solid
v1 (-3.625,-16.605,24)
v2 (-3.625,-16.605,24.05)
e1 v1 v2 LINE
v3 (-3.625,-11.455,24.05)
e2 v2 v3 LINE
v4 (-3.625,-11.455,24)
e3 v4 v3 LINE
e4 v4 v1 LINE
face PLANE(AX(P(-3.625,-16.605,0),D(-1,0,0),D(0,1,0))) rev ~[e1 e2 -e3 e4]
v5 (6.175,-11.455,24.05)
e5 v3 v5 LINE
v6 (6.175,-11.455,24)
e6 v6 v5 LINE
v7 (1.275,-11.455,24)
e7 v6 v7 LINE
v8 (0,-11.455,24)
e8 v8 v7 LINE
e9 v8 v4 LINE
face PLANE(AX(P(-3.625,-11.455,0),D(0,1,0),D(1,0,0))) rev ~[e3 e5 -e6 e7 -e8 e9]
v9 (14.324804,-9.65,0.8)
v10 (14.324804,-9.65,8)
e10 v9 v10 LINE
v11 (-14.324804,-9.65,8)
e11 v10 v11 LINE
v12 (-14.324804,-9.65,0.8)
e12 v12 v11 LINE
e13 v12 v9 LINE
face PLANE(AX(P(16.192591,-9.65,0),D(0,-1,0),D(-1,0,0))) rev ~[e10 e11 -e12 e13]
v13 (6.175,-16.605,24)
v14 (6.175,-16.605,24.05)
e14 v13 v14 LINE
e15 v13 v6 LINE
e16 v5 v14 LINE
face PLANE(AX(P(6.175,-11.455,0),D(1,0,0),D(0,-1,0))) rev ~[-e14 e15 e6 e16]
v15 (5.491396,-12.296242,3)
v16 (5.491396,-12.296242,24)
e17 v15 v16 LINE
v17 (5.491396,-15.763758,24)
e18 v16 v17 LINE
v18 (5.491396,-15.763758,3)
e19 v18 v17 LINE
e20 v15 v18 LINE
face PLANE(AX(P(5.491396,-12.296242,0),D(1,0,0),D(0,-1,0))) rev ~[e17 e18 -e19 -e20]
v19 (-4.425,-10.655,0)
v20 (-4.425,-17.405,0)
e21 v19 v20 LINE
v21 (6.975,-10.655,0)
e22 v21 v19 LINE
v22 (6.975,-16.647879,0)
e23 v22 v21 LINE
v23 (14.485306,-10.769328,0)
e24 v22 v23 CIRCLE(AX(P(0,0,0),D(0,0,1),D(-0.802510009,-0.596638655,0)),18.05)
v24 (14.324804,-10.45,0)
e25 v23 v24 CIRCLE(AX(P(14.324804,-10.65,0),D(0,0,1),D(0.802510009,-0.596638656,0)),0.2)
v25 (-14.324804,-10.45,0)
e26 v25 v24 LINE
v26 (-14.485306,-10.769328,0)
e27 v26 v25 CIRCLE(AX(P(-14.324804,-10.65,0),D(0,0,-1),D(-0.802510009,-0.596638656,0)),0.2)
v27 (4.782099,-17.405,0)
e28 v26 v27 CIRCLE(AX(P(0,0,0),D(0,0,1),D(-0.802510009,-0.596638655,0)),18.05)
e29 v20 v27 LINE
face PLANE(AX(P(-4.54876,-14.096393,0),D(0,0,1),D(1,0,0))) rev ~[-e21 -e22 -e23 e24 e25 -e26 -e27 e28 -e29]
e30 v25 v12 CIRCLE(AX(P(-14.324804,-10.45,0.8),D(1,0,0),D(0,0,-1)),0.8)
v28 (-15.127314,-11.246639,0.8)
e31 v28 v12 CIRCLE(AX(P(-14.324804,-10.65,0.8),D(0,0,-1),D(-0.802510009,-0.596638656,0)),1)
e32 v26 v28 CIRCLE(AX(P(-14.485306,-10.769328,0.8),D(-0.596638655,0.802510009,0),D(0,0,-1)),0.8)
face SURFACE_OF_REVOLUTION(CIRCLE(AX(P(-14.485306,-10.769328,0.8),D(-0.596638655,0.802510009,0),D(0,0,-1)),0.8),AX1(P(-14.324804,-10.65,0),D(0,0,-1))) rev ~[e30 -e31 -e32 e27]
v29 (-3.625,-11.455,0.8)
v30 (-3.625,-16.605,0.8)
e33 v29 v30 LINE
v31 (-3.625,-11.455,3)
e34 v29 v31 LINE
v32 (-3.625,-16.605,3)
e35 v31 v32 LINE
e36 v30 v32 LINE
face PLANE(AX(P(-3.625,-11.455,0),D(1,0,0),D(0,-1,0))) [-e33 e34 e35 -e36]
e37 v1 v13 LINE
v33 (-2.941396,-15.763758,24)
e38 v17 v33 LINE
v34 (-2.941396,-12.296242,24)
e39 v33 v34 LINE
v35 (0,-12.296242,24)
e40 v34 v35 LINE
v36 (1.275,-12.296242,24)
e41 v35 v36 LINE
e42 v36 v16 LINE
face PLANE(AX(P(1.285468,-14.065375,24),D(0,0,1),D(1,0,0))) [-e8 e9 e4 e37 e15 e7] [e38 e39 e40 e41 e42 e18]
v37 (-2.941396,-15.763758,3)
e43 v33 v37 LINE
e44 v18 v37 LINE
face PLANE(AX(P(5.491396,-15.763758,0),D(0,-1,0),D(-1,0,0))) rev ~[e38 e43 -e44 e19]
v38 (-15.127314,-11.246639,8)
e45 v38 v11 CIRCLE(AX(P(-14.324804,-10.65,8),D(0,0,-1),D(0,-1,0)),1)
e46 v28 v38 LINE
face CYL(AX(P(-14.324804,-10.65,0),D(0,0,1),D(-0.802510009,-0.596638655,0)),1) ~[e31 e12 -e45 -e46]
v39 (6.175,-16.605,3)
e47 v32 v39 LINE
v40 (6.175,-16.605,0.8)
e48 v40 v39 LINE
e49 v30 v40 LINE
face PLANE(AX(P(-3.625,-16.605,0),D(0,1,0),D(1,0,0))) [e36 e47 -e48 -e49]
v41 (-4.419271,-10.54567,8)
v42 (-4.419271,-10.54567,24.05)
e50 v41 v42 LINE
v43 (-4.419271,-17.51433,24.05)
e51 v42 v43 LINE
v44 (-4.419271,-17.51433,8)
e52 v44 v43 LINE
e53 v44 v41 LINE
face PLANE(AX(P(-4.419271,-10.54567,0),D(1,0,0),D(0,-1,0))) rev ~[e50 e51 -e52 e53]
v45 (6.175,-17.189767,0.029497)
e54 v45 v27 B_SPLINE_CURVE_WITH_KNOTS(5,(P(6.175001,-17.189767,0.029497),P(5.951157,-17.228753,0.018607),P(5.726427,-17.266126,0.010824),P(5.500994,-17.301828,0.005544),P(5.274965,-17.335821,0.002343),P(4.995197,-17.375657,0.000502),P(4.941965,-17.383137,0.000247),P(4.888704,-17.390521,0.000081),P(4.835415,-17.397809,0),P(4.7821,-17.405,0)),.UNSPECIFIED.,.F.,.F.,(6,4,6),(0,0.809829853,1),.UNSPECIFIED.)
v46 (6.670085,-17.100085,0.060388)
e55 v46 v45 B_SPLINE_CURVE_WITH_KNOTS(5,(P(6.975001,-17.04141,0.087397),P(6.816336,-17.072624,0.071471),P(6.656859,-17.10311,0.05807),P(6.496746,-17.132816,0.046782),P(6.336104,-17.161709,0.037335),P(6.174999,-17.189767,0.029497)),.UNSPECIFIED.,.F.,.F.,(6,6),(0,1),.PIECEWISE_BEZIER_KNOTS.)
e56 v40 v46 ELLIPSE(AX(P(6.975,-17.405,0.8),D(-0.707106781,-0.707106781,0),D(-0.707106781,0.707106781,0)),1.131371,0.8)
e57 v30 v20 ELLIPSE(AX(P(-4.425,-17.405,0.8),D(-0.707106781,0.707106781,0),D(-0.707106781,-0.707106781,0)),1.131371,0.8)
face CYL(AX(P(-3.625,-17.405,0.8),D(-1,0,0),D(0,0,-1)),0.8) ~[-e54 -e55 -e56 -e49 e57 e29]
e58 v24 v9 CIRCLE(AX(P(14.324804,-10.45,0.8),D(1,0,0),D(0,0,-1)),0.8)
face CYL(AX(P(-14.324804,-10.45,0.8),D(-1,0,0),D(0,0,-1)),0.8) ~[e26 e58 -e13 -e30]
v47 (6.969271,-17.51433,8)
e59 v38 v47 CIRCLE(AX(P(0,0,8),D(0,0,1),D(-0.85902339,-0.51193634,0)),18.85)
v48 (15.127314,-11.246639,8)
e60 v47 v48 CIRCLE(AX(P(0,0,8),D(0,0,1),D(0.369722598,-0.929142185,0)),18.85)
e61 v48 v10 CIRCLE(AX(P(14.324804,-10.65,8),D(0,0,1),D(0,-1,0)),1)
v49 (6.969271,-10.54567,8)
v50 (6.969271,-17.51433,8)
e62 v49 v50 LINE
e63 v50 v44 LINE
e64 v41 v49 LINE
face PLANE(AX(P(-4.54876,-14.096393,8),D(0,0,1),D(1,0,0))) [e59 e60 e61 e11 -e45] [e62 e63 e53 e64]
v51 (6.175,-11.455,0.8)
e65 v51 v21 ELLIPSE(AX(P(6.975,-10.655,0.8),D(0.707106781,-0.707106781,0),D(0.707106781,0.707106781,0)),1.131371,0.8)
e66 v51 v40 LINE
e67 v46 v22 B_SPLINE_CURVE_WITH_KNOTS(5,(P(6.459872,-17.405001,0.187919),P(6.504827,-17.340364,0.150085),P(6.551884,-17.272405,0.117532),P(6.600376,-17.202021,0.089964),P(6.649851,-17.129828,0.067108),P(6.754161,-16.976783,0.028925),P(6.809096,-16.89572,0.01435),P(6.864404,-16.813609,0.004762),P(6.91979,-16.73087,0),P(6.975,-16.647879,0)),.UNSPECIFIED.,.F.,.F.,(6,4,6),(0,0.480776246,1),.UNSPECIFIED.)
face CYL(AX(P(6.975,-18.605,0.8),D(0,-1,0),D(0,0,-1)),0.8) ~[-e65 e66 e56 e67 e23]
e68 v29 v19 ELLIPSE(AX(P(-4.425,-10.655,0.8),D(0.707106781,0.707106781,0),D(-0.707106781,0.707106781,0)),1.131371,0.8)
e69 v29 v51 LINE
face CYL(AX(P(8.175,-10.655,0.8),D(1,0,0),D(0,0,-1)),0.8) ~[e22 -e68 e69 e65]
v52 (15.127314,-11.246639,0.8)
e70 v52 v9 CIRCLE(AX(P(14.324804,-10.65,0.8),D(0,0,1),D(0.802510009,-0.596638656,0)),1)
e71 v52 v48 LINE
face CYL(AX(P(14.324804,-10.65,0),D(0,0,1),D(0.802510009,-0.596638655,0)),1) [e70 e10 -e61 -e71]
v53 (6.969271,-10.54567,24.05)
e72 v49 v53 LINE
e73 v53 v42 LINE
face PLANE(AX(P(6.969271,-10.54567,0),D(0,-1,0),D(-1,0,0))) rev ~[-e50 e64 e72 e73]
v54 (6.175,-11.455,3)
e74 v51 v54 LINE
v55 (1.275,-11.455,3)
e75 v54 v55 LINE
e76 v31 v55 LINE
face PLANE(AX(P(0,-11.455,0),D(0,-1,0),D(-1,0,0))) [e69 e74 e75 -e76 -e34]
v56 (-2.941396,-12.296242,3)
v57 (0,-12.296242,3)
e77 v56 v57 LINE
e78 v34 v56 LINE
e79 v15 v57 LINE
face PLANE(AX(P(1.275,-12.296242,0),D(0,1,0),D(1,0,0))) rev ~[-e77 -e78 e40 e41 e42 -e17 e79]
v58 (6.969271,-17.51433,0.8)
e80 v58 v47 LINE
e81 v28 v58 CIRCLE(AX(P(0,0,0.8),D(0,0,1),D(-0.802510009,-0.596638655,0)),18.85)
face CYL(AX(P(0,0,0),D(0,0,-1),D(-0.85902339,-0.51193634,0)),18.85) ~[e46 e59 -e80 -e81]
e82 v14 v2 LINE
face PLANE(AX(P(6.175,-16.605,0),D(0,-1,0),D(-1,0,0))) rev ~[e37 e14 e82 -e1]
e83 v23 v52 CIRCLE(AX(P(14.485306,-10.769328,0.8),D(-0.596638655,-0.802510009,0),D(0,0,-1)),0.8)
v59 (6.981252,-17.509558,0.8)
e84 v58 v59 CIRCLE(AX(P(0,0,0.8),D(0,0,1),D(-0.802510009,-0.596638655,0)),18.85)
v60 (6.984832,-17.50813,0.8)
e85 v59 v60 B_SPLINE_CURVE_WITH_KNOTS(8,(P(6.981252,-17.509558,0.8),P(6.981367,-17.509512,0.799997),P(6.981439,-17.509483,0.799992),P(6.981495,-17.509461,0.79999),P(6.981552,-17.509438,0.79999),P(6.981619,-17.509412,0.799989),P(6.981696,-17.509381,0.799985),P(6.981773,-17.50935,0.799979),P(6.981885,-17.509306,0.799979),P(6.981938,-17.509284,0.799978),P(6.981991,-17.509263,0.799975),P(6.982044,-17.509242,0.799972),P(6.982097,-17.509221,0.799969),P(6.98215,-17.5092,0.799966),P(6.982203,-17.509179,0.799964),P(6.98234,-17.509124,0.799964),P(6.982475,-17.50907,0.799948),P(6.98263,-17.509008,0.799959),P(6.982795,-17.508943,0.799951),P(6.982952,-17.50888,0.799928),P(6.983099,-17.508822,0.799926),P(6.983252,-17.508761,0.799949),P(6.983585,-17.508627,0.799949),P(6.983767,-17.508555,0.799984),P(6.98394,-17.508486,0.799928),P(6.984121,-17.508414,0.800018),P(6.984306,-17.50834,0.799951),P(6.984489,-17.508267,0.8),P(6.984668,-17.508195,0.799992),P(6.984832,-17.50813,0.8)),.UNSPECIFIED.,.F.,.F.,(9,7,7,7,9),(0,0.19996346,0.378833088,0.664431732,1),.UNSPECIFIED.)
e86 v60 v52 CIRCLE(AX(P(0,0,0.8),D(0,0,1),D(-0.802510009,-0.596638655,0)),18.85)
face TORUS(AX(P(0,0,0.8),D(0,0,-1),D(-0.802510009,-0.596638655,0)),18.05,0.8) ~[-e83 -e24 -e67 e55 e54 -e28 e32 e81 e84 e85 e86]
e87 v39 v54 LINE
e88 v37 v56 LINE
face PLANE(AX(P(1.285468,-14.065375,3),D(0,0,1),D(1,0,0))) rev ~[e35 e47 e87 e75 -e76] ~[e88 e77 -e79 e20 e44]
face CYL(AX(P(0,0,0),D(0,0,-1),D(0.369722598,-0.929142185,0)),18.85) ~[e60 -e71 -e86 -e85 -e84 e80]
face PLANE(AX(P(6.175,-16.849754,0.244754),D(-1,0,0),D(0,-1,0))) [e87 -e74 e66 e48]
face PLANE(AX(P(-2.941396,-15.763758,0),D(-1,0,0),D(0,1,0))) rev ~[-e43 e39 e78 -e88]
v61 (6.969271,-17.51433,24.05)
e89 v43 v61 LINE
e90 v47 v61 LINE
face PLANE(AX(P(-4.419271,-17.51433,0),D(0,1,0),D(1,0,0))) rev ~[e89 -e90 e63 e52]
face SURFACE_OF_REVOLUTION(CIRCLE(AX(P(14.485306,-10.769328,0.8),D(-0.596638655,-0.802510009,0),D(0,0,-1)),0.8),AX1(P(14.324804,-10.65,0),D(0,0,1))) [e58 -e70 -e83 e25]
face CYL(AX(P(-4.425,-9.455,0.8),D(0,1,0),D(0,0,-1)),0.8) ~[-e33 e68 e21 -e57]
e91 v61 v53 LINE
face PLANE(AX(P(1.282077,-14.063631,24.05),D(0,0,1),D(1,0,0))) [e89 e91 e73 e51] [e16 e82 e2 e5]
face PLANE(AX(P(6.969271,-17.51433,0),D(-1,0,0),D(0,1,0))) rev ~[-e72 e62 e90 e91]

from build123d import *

# Parameters (mm, degrees)
F0_W         = 1.275
F0_H         = 0.8956698048
F0_H_2       = 0.9093301952
F0_H_3       = 0.8412417081
F1_DEPTH     = 8
F2_DEPTH     = 3
F3_DEPTH     = 21
F4_DEPTH     = 24.05
F5_R         = 1
F6_T1_DEPTH  = 28.6496073272
F6_T3_DEPTH  = 9.8
F6_T5_DEPTH  = 5.15
F6_T8_ANGLE  = 126.6295364974
F6_T10_ANGLE = 126.6295364974
F6_T12_ANGLE = 106.7409270051
F6_T17_DEPTH = 11.8
F6_T21_DEPTH = 7.15
F6_T28_DEPTH = 11.8
F6_T32_DEPTH = 7.15
F6_T39_DEPTH = 7.15
F6_T43_DEPTH = 11.8
F6_T50_DEPTH = 11.8
F6_T54_DEPTH = 7.15


# Not quite as in the source:
# - a fillet or chamfer that OpenCascade refuses, or shapes differently, is made with other operations: its cross-section is extruded or revolved along the edge and cut away or added


with BuildPart() as f1:
    # F0 (on Top) → F1 (new body)
    with BuildSketch(Plane.XY):
        with BuildLine():
            Line((0, -9.65), (-16.1925908983, -9.65))
            ThreePointArc((-16.1925908983, -9.65), (-6.0604727533, -17.8491784127), (6.9692709671, -17.5143301952))
            Line((6.9692709671, -17.5143301952), (-4.4192709671, -17.5143301952))
            Line((-4.4192709671, -17.5143301952), (-4.4192709671, -10.5456698048))
            Line((-4.4192709671, -10.5456698048), (0, -10.5456698048))
            Line((0, -10.5456698048), (0, -9.65))
        make_face()
        with BuildLine():
            ThreePointArc((6.9692709671, -17.5143301952), (12.2302855086, -14.3437309086), (16.1925908983, -9.65))
            Line((16.1925908983, -9.65), (1.275, -9.65))
            Line((1.275, -9.65), (1.275, -10.5456698048))
            Line((1.275, -10.5456698048), (6.9692709671, -10.5456698048))
            Line((6.9692709671, -10.5456698048), (6.9692709671, -17.5143301952))
        make_face()
        with Locations((0.6375, -10.0978349024)):
            Rectangle(F0_W, F0_H)
        Polygon((-4.4192709671, -17.5143301952), (6.9692709671, -17.5143301952), (6.9692709671, -10.5456698048), (1.275, -10.5456698048), (1.275, -11.455), (6.175, -11.455), (6.175, -16.605), (-3.625, -16.605), (-3.625, -11.455), (0, -11.455), (0, -10.5456698048), (-4.4192709671, -10.5456698048), align=None)
        with Locations((0.6375, -11.0003349024)):
            Rectangle(F0_W, F0_H_2)
        Polygon((0, -12.2962417081), (0, -11.455), (-3.625, -11.455), (-3.625, -16.605), (6.175, -16.605), (6.175, -11.455), (1.275, -11.455), (1.275, -12.2962417081), (5.4913964123, -12.2962417081), (5.4913964123, -15.7637582919), (-2.9413964123, -15.7637582919), (-2.9413964123, -12.2962417081), align=None)
        with Locations((0.6375, -11.875620854)):
            Rectangle(F0_W, F0_H_3)
    extrude(amount=F1_DEPTH)

    # F0 (on Top) → F2 (cut)
    with BuildSketch(Plane.XY):
        Polygon((0, -12.2962417081), (0, -11.455), (-3.625, -11.455), (-3.625, -16.605), (6.175, -16.605), (6.175, -11.455), (1.275, -11.455), (1.275, -12.2962417081), (5.4913964123, -12.2962417081), (5.4913964123, -15.7637582919), (-2.9413964123, -15.7637582919), (-2.9413964123, -12.2962417081), align=None)
        with Locations((0.6375, -11.875620854)):
            Rectangle(F0_W, F0_H_3)
    extrude(amount=F2_DEPTH, mode=Mode.SUBTRACT)

    # F3 (add): a face of the model
    f3_faces = [f1.faces().sort_by_distance(p)[0] for p in [
        (1.275, -16.4942920509, 3),
    ]]
    extrude(f3_faces, amount=-F3_DEPTH)

    # F0 (on Top) → F4 (join)
    with BuildSketch(Plane.XY):
        Polygon((-4.4192709671, -17.5143301952), (6.9692709671, -17.5143301952), (6.9692709671, -10.5456698048), (1.275, -10.5456698048), (1.275, -11.455), (6.175, -11.455), (6.175, -16.605), (-3.625, -16.605), (-3.625, -11.455), (0, -11.455), (0, -10.5456698048), (-4.4192709671, -10.5456698048), align=None)
        with Locations((0.6375, -11.0003349024)):
            Rectangle(F0_W, F0_H_2)
    extrude(amount=F4_DEPTH)

    # F5
    f5_edges = [f1.edges().sort_by_distance(p)[0] for p in [
        (16.192591, -9.65, 4),
        (-16.192591, -9.65, 4),
    ]]
    fillet(f5_edges, radius=F5_R)

    # F6: fillet of radius 0.8 on 8 edges, made by hand

    # F6_s2 → F6_t1 (cut)
    with BuildSketch(Plane.YZ.offset(-14.3248036636)):
        with BuildLine():
            ThreePointArc((-10.45, 0), (-9.8843145751, 0.2343145751), (-9.65, 0.8))
            Line((-9.65, 0.8), (-9.65, 0))
            Line((-9.65, 0), (-10.45, 0))
        make_face()
    extrude(amount=F6_T1_DEPTH, mode=Mode.SUBTRACT)

    # F6_s4 → F6_t3 (cut)
    with BuildSketch(Plane.YZ.offset(-3.625)):
        with BuildLine():
            ThreePointArc((-17.405, 0), (-16.8393145751, 0.2343145751), (-16.605, 0.8))
            Line((-16.605, 0.8), (-16.605, 0))
            Line((-16.605, 0), (-17.405, 0))
        make_face()
        with BuildLine():
            ThreePointArc((-10.655, 0), (-11.2206854249, 0.2343145751), (-11.455, 0.8))
            Line((-11.455, 0.8), (-11.455, 0))
            Line((-11.455, 0), (-10.655, 0))
        make_face()
    extrude(amount=F6_T3_DEPTH, mode=Mode.SUBTRACT)

    # F6_s6 → F6_t5 (cut)
    with BuildSketch(Plane.XZ.offset(11.455)):
        with BuildLine():
            ThreePointArc((-4.425, 0), (-3.8593145751, 0.2343145751), (-3.625, 0.8))
            Line((-3.625, 0.8), (-3.625, 0))
            Line((-3.625, 0), (-4.425, 0))
        make_face()
        with BuildLine():
            ThreePointArc((6.975, 0), (6.4093145751, 0.2343145751), (6.175, 0.8))
            Line((6.175, 0.8), (6.175, 0))
            Line((6.175, 0), (6.975, 0))
        make_face()
    extrude(amount=F6_T5_DEPTH, mode=Mode.SUBTRACT)

    # F6_s7 → F6_t8 (revolve, cut)
    with BuildSketch(Plane(origin=(0, 0, 0), x_dir=(0, 0, 1), z_dir=(-0.5966386555, -0.8025100092, 0))):
        with BuildLine():
            ThreePointArc((0, -18.05), (0.2343145751, -18.6156854249), (0.8, -18.85))
            Line((0.8, -18.85), (0, -18.85))
            Line((0, -18.85), (0, -18.05))
        make_face()
    revolve(axis=Axis((14.3248036636, -10.65, 0), (0, 0, 1)), revolution_arc=F6_T8_ANGLE, mode=Mode.SUBTRACT)

    # F6_s9 → F6_t10 (revolve, cut)
    with BuildSketch(Plane(origin=(0, 0, 0), x_dir=(0, 0, 1), z_dir=(0.5966386555, -0.8025100092, 0))):
        with BuildLine():
            ThreePointArc((0, 18.05), (0.2343145751, 18.6156854249), (0.8, 18.85))
            Line((0.8, 18.85), (0, 18.85))
            Line((0, 18.85), (0, 18.05))
        make_face()
    revolve(axis=Axis((-14.3248036636, -10.65, 0), (0, 0, -1)), revolution_arc=F6_T10_ANGLE, mode=Mode.SUBTRACT)

    # F6_s11 → F6_t12 (revolve, cut)
    with BuildSketch(Plane(origin=(0, 0, 0), x_dir=(0, 0, 1), z_dir=(-0.5966386555, 0.8025100092, 0))):
        with BuildLine():
            ThreePointArc((0.8, -18.85), (0.2343145751, -18.6156854249), (0, -18.05))
            Line((0, -18.05), (0, -18.85))
            Line((0, -18.85), (0.8, -18.85))
        make_face()
    revolve(axis=Axis((0, 0, 0), (0, 0, 1)), revolution_arc=F6_T12_ANGLE, mode=Mode.SUBTRACT)


with BuildPart() as f6_tool15:
    # F6_s16 → F6_t17 (new body)
    with BuildSketch(Plane.YZ.offset(-5.625)):
        with BuildLine():
            ThreePointArc((-17.405, 0), (-16.8393145751, 0.2343145751), (-16.605, 0.8))
            Line((-16.605, 0.8), (-16.605, 0))
            Line((-16.605, 0), (-17.405, 0))
        make_face()
    extrude(amount=F6_T17_DEPTH)

    split(bisect_by=Plane.YZ.offset(-3.625), keep=Keep.BOTTOM)


with BuildPart() as f6_tool19:
    # F6_s20 → F6_t21 (new body)
    with BuildSketch(Plane.XZ.offset(11.455)):
        with BuildLine():
            ThreePointArc((-4.425, 0), (-3.8593145751, 0.2343145751), (-3.625, 0.8))
            Line((-3.625, 0.8), (-3.625, 0))
            Line((-3.625, 0), (-4.425, 0))
        make_face()
    extrude(amount=F6_T21_DEPTH)

    split(bisect_by=Plane.XZ.offset(16.605), keep=Keep.TOP)


with BuildPart() as f6_tool15_1:
    add(f6_tool15.part)

    # F6_t23: intersect F6_tool19
    add(f6_tool19.part, mode=Mode.INTERSECT)


with BuildPart() as f1_1:
    add(f1.part)

    # F6_t13: cut F6_tool15
    add(f6_tool15_1.part, mode=Mode.SUBTRACT)


with BuildPart() as f6_tool26:
    # F6_s27 → F6_t28 (new body)
    with BuildSketch(Plane.YZ.offset(-3.625)):
        with BuildLine():
            ThreePointArc((-17.405, 0), (-16.8393145751, 0.2343145751), (-16.605, 0.8))
            Line((-16.605, 0.8), (-16.605, 0))
            Line((-16.605, 0), (-17.405, 0))
        make_face()
    extrude(amount=F6_T28_DEPTH)

    split(bisect_by=Plane.YZ.offset(6.175), keep=Keep.TOP)


with BuildPart() as f6_tool30:
    # F6_s31 → F6_t32 (new body)
    with BuildSketch(Plane.XZ.offset(18.605)):
        with BuildLine():
            ThreePointArc((6.975, 0), (6.4093145751, 0.2343145751), (6.175, 0.8))
            Line((6.175, 0.8), (6.175, 0))
            Line((6.175, 0), (6.975, 0))
        make_face()
    extrude(amount=-F6_T32_DEPTH)

    split(bisect_by=Plane.XZ.offset(16.605), keep=Keep.TOP)


with BuildPart() as f6_tool26_1:
    add(f6_tool26.part)

    # F6_t34: intersect F6_tool30
    add(f6_tool30.part, mode=Mode.INTERSECT)


with BuildPart() as f1_2:
    add(f1_1.part)

    # F6_t24: cut F6_tool26
    add(f6_tool26_1.part, mode=Mode.SUBTRACT)


with BuildPart() as f6_tool37:
    # F6_s38 → F6_t39 (new body)
    with BuildSketch(Plane.XZ.offset(9.455)):
        with BuildLine():
            ThreePointArc((-4.425, 0), (-3.8593145751, 0.2343145751), (-3.625, 0.8))
            Line((-3.625, 0.8), (-3.625, 0))
            Line((-3.625, 0), (-4.425, 0))
        make_face()
    extrude(amount=F6_T39_DEPTH)

    split(bisect_by=Plane.XZ.offset(11.455), keep=Keep.BOTTOM)


with BuildPart() as f6_tool41:
    # F6_s42 → F6_t43 (new body)
    with BuildSketch(Plane.YZ.offset(6.175)):
        with BuildLine():
            ThreePointArc((-10.655, 0), (-11.2206854249, 0.2343145751), (-11.455, 0.8))
            Line((-11.455, 0.8), (-11.455, 0))
            Line((-11.455, 0), (-10.655, 0))
        make_face()
    extrude(amount=-F6_T43_DEPTH)

    split(bisect_by=Plane.YZ.offset(-3.625), keep=Keep.BOTTOM)


with BuildPart() as f6_tool37_1:
    add(f6_tool37.part)

    # F6_t45: intersect F6_tool41
    add(f6_tool41.part, mode=Mode.INTERSECT)


with BuildPart() as f1_3:
    add(f1_2.part)

    # F6_t35: cut F6_tool37
    add(f6_tool37_1.part, mode=Mode.SUBTRACT)


with BuildPart() as f6_tool48:
    # F6_s49 → F6_t50 (new body)
    with BuildSketch(Plane.YZ.offset(8.175)):
        with BuildLine():
            ThreePointArc((-10.655, 0), (-11.2206854249, 0.2343145751), (-11.455, 0.8))
            Line((-11.455, 0.8), (-11.455, 0))
            Line((-11.455, 0), (-10.655, 0))
        make_face()
    extrude(amount=-F6_T50_DEPTH)

    split(bisect_by=Plane.YZ.offset(6.175), keep=Keep.TOP)


with BuildPart() as f6_tool52:
    # F6_s53 → F6_t54 (new body)
    with BuildSketch(Plane.XZ.offset(16.605)):
        with BuildLine():
            ThreePointArc((6.975, 0), (6.4093145751, 0.2343145751), (6.175, 0.8))
            Line((6.175, 0.8), (6.175, 0))
            Line((6.175, 0), (6.975, 0))
        make_face()
    extrude(amount=-F6_T54_DEPTH)

    split(bisect_by=Plane.XZ.offset(11.455), keep=Keep.BOTTOM)


with BuildPart() as f6_tool48_1:
    add(f6_tool48.part)

    # F6_t56: intersect F6_tool52
    add(f6_tool52.part, mode=Mode.INTERSECT)


with BuildPart() as f1_4:
    add(f1_3.part)

    # F6_t46: cut F6_tool48
    add(f6_tool48_1.part, mode=Mode.SUBTRACT)


solid = f1_4.part
